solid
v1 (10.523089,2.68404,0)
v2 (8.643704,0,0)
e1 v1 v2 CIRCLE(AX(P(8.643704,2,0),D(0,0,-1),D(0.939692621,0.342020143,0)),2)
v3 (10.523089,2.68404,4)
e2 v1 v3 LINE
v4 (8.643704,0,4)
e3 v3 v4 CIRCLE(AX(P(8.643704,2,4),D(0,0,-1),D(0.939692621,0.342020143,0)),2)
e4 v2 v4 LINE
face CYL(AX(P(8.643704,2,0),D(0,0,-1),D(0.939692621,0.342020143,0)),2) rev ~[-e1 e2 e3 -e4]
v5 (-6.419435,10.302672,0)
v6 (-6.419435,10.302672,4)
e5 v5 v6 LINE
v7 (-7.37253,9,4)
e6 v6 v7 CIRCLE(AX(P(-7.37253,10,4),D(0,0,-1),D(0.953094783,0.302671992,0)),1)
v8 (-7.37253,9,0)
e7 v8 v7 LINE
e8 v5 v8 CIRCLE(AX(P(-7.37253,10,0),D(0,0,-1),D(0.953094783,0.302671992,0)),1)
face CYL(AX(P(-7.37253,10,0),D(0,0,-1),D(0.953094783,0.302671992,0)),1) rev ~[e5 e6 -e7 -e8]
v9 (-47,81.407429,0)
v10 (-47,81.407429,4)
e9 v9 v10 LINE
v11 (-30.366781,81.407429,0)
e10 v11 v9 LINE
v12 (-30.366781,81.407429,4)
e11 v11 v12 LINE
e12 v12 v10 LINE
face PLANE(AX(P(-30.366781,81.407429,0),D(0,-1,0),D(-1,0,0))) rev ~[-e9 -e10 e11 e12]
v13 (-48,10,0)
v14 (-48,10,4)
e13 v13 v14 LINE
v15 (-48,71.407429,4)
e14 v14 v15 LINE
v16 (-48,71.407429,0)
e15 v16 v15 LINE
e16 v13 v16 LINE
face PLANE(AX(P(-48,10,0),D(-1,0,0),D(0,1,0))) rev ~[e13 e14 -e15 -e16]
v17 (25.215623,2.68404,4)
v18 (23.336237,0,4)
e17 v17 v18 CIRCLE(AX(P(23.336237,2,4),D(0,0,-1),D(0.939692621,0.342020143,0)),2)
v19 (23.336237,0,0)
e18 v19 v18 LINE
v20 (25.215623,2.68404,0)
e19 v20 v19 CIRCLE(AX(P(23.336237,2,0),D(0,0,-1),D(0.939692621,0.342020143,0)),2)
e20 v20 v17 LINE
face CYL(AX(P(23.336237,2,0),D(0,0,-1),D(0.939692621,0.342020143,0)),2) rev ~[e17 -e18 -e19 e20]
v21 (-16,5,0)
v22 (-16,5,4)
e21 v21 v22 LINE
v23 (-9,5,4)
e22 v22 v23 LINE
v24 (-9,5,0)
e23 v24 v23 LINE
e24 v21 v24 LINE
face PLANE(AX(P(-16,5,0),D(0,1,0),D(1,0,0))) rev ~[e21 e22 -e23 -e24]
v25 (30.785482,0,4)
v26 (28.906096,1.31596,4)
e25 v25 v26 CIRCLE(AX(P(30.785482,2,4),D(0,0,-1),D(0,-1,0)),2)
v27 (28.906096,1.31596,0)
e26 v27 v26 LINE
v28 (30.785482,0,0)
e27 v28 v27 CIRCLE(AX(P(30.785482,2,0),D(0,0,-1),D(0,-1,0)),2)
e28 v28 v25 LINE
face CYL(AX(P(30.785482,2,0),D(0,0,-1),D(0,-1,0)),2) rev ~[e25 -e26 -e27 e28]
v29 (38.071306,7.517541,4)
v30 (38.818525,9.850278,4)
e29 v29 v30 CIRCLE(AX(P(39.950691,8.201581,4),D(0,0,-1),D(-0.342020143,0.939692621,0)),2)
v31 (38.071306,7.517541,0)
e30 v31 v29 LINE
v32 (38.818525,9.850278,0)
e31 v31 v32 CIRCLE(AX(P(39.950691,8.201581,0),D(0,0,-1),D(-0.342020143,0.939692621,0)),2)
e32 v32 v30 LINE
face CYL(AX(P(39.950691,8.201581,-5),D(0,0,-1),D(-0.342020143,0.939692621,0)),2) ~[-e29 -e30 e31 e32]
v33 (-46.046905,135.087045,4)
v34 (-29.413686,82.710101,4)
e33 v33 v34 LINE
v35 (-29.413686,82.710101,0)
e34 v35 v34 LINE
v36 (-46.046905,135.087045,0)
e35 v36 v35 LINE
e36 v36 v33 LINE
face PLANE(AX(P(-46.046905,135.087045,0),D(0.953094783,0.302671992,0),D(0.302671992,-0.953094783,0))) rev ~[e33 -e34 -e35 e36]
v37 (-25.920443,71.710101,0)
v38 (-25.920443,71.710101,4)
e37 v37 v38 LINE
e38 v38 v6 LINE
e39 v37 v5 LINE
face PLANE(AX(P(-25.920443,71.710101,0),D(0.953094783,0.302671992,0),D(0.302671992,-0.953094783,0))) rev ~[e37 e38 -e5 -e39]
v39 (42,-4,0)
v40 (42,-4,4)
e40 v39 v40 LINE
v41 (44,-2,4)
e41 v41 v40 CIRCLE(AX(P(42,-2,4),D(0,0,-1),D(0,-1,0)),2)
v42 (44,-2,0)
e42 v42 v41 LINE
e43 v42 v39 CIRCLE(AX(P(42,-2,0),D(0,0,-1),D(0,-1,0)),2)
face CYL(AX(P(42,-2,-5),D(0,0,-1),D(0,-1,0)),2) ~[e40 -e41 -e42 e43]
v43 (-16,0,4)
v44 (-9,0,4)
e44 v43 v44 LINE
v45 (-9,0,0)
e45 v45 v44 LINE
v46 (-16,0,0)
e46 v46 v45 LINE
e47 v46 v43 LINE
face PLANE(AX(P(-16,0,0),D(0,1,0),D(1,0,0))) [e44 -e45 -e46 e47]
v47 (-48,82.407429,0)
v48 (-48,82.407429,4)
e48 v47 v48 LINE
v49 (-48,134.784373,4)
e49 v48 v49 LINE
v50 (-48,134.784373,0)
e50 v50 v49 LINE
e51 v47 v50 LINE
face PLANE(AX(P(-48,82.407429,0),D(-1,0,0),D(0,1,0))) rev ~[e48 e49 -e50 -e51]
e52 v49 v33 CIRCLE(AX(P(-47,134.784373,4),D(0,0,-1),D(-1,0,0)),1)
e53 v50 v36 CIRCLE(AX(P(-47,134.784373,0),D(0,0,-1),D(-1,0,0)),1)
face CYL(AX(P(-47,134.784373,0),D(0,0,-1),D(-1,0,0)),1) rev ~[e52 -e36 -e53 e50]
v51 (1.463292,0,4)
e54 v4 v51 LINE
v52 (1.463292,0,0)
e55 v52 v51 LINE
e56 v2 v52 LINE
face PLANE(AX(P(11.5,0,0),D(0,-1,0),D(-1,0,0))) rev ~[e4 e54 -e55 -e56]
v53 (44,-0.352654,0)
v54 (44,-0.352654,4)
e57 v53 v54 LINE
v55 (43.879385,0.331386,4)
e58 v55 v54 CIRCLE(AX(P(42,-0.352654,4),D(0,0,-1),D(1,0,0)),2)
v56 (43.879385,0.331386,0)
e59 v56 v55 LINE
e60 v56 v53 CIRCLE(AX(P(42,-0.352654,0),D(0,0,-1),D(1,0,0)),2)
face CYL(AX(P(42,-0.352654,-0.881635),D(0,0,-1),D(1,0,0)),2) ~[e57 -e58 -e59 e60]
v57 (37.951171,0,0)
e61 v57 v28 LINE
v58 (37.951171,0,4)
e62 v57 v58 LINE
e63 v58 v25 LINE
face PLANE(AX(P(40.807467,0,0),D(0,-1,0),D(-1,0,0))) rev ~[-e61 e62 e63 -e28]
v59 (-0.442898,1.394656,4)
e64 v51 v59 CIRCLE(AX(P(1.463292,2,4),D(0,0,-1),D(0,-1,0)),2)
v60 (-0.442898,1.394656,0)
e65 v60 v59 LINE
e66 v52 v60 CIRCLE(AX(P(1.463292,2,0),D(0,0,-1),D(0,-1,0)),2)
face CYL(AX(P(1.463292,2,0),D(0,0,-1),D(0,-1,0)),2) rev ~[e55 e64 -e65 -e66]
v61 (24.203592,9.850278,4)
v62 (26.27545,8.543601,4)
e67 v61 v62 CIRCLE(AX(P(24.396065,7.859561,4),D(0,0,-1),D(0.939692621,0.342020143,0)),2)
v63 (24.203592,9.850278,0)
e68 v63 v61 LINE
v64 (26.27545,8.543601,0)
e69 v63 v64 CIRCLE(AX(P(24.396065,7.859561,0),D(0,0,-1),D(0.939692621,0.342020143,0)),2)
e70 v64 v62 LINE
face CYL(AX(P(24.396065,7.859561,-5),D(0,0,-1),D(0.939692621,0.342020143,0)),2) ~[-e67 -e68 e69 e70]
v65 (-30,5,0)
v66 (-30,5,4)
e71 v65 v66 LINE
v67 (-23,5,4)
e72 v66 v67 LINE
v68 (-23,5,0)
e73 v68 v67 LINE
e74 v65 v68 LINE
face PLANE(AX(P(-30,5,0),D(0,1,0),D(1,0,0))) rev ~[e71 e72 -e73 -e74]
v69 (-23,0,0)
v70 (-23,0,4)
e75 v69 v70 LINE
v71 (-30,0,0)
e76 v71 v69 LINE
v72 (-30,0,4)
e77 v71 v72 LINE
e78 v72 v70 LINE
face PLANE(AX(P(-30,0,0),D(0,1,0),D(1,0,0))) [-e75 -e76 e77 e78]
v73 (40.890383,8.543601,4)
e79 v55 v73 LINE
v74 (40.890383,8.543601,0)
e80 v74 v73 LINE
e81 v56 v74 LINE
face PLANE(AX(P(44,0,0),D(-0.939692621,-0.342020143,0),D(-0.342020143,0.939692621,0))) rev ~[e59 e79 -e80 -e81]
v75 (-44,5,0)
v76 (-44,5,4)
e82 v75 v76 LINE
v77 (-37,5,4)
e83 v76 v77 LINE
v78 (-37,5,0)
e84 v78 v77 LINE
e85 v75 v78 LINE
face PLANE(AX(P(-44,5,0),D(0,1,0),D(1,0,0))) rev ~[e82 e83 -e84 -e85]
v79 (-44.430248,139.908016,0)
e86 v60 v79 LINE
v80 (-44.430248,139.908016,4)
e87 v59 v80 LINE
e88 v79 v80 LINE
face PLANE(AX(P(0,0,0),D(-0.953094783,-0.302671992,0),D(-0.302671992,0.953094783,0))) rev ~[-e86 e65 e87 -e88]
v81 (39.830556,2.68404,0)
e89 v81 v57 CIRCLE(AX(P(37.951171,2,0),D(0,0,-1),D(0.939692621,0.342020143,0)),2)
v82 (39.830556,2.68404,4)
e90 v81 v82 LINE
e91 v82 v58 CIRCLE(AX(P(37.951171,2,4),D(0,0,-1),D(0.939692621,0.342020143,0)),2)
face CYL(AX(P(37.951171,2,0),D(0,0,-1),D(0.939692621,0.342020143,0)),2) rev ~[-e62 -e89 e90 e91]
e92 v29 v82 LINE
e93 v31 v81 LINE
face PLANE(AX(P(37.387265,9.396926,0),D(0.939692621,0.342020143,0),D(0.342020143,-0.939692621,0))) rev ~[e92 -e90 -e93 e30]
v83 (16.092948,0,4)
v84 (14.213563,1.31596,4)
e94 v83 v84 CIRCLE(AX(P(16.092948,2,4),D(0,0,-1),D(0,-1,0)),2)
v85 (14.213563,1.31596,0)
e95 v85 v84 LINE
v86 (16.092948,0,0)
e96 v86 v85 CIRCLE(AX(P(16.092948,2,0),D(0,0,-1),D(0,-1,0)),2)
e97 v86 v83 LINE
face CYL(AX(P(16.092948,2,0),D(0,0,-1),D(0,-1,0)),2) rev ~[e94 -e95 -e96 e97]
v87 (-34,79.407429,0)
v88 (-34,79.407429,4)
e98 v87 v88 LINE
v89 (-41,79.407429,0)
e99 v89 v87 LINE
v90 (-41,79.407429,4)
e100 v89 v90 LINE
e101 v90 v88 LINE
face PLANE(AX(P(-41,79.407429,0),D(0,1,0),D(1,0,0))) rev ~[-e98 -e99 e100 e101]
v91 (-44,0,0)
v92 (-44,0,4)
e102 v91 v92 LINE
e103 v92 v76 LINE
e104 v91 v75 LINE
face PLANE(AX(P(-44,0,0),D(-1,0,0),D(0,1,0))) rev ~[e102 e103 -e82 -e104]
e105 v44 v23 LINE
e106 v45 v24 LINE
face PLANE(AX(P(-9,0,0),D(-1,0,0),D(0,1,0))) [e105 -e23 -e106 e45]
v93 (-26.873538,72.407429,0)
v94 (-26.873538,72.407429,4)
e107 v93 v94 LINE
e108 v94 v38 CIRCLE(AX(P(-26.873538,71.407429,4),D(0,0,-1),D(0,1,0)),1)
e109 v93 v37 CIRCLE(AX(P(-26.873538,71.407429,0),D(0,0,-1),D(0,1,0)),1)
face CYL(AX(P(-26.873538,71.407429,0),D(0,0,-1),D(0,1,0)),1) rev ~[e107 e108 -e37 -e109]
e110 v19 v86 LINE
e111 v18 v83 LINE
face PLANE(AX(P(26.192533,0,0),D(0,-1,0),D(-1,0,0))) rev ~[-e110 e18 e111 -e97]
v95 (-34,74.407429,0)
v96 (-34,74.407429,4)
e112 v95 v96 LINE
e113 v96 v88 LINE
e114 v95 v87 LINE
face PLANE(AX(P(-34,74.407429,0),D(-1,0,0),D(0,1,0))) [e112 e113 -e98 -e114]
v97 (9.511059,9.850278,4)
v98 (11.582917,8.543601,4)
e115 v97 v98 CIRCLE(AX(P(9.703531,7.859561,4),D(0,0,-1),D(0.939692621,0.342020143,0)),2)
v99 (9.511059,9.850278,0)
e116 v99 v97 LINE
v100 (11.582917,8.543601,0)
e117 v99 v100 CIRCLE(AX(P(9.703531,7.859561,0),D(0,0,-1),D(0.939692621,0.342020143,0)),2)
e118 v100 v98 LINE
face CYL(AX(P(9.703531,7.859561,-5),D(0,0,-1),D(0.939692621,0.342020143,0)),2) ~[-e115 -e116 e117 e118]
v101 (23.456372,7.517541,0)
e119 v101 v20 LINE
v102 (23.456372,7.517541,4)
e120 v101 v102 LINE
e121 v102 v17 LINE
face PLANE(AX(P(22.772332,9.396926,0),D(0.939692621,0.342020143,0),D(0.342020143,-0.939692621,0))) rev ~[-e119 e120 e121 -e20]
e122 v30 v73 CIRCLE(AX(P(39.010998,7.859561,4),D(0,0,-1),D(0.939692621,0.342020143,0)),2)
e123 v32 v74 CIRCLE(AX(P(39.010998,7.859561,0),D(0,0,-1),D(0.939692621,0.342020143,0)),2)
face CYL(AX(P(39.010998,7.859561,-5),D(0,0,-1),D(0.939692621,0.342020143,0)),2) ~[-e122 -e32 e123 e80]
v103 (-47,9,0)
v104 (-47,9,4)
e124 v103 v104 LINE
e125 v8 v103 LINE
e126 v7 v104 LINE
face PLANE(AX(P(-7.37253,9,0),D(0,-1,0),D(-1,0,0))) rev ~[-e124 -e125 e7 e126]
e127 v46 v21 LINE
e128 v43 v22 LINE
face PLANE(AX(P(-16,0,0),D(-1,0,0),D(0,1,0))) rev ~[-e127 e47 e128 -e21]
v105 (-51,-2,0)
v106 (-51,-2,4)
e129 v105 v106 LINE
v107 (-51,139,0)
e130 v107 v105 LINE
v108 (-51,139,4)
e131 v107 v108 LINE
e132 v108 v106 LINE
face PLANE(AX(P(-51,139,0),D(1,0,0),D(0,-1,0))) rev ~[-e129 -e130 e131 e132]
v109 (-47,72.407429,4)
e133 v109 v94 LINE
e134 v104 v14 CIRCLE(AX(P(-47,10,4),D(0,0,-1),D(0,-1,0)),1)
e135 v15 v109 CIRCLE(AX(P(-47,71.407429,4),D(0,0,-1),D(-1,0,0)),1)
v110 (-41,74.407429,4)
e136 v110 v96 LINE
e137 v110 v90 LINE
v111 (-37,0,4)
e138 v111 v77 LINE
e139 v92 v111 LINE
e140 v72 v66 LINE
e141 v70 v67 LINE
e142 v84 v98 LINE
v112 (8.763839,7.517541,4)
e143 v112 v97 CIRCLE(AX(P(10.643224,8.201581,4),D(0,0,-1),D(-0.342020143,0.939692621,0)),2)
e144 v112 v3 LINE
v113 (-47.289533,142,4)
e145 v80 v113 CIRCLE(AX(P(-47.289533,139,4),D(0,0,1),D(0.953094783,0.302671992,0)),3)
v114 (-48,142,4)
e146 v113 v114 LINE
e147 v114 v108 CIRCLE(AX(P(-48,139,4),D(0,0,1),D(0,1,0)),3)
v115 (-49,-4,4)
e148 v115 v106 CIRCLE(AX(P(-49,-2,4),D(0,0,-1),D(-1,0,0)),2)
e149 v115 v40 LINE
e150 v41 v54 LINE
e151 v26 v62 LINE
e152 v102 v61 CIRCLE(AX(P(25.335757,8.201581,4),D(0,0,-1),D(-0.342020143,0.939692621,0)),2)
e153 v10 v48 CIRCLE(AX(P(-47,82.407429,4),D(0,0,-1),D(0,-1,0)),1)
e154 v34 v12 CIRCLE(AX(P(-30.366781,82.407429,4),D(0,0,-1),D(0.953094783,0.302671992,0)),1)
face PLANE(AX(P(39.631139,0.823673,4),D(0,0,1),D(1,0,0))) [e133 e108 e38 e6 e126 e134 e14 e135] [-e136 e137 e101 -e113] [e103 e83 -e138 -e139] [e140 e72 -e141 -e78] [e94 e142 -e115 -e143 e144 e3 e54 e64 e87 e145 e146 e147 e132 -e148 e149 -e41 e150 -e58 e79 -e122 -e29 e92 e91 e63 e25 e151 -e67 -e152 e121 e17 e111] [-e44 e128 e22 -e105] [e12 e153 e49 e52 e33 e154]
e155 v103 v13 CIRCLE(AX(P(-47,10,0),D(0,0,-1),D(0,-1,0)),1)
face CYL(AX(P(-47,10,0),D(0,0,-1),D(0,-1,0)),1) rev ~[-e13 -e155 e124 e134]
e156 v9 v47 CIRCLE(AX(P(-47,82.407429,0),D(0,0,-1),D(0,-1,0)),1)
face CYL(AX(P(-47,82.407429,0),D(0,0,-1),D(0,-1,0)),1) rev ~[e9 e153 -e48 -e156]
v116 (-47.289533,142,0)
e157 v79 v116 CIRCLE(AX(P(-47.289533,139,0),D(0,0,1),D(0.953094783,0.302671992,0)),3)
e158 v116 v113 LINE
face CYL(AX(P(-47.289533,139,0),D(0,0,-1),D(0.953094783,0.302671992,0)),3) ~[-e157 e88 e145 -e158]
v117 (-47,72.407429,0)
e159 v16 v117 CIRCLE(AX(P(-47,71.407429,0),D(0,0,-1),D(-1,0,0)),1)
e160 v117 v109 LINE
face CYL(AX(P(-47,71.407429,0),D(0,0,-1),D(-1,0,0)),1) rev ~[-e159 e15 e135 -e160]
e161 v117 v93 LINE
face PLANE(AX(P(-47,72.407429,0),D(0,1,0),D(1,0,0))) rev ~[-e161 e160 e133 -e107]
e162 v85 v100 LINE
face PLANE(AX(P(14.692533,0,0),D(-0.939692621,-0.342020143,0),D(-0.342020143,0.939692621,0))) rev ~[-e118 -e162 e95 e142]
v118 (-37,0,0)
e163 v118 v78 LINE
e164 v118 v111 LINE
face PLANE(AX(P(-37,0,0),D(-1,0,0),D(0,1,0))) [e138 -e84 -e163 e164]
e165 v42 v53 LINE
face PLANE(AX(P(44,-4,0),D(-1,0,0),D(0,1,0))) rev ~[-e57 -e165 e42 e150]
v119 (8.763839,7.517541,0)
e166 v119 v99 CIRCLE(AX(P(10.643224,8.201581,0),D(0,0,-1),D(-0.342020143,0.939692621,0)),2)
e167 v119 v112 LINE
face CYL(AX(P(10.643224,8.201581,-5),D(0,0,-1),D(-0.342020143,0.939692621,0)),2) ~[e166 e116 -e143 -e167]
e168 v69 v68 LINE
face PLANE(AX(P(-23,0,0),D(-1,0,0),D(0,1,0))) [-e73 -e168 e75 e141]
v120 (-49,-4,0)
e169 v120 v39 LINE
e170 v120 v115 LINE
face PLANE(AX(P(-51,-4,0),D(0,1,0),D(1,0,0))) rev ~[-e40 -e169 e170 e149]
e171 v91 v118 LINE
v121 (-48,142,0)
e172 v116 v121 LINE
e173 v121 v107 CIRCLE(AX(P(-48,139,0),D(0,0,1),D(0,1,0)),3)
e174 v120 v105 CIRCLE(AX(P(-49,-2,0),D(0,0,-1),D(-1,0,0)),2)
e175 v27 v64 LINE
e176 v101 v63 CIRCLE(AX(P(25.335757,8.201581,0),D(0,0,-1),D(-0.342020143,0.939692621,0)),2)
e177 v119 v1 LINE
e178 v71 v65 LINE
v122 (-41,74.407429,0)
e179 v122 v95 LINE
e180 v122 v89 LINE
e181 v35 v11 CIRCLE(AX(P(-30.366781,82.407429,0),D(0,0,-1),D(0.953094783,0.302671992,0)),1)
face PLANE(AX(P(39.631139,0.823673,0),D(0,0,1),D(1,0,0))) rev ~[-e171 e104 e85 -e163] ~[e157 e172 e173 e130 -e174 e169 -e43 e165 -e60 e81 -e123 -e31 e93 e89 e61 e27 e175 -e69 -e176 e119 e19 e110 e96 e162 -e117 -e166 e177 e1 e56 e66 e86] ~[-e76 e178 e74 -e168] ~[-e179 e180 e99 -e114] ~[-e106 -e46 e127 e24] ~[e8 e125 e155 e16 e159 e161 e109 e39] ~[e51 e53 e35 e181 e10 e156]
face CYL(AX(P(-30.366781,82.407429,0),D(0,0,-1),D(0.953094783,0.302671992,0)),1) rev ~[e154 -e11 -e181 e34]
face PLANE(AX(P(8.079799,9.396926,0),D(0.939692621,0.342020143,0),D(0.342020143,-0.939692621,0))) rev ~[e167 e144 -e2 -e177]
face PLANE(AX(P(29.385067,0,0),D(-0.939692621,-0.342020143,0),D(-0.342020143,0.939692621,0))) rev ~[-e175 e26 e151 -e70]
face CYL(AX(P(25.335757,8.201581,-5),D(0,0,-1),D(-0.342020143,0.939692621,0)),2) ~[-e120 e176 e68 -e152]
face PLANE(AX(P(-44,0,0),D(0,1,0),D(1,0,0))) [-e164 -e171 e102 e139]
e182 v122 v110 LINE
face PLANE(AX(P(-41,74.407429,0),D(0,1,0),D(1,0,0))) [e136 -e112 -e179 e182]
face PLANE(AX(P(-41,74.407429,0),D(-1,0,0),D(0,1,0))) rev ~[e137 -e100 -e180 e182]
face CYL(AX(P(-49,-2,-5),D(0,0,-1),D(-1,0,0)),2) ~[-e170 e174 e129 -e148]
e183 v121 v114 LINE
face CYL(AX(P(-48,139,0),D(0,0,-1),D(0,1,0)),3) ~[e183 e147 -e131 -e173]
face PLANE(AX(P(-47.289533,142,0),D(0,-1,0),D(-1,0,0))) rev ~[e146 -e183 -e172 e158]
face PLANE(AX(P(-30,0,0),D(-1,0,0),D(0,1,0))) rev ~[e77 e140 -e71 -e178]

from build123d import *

# Parameters (mm, degrees)
F0_W        = 7
F0_H        = 5
F1_DEPTH    = 4
F2_T1_DEPTH = 4
F2_T3_DEPTH = 14
F2_T5_DEPTH = 5.7632698071


# Not quite as in the source:
# - a fillet or chamfer that OpenCascade refuses, or shapes differently, is made with other operations: its cross-section is extruded or revolved along the edge and cut away or added


with BuildPart() as f1:
    # F0 (on Top) → F1 (new body)
    with BuildSketch(Plane.XY):
        with BuildLine():
            Line((-51, -4), (44, -4))
            Line((44, -4), (44, 0))
            Line((44, 0), (40.8074666826, 0))
            Line((40.8074666826, 0), (29.3850666349, 0))
            Line((29.3850666349, 0), (26.1925333174, 0))
            Line((26.1925333174, 0), (14.6925333174, 0))
            Line((14.6925333174, 0), (11.5, 0))
            Line((11.5, 0), (0, 0))
            Line((0, 0), (-44.4302483166, 139.9080159757))
            ThreePointArc((-44.4302483166, 139.9080159757), (-45.5180993372, 141.4211616971), (-47.2895326655, 142))
            Line((-47.2895326655, 142), (-48, 142))
            ThreePointArc((-48, 142), (-50.1213203436, 141.1213203436), (-51, 139))
            Line((-51, 139), (-51, -4))
        make_face()
        with Locations((-40.5, 2.5)):
            Rectangle(F0_W, F0_H, mode=Mode.SUBTRACT)
        with Locations((-26.5, 2.5)):
            Rectangle(F0_W, F0_H, mode=Mode.SUBTRACT)
        with Locations((-12.5, 2.5)):
            Rectangle(F0_W, F0_H, mode=Mode.SUBTRACT)
        with BuildLine():
            Line((-7.3725300405, 9), (-47, 9))
            ThreePointArc((-47, 9), (-47.7071067812, 9.2928932188), (-48, 10))
            Line((-48, 10), (-48, 71.4074290533))
            ThreePointArc((-48, 71.4074290533), (-47.7071067812, 72.1145358345), (-47, 72.4074290533))
            Line((-47, 72.4074290533), (-26.8735379155, 72.4074290533))
            ThreePointArc((-26.8735379155, 72.4074290533), (-26.2830601394, 72.2144829523), (-25.9204431326, 71.7101010452))
            Line((-25.9204431326, 71.7101010452), (-6.4194352575, 10.3026719919))
            ThreePointArc((-6.4194352575, 10.3026719919), (-6.5654761415, 9.4095222239), (-7.3725300405, 9))
        make_face(mode=Mode.SUBTRACT)
        with Locations((-37.5, 76.9074290533)):
            Rectangle(F0_W, F0_H, mode=Mode.SUBTRACT)
        with BuildLine():
            ThreePointArc((-48, 134.7843734895), (-47.1531424452, 135.7725776139), (-46.046905217, 135.0870454814))
            Line((-46.046905217, 135.0870454814), (-29.4136863758, 82.7101010452))
            ThreePointArc((-29.4136863758, 82.7101010452), (-29.5597272597, 81.8169512772), (-30.3667811588, 81.4074290533))
            Line((-30.3667811588, 81.4074290533), (-47, 81.4074290533))
            ThreePointArc((-47, 81.4074290533), (-47.7071067812, 81.7003222721), (-48, 82.4074290533))
            Line((-48, 82.4074290533), (-48, 134.7843734895))
        make_face(mode=Mode.SUBTRACT)
        Polygon((40.8074666826, 0), (44, 0), (40.2063431117, 10.4229866378), (37.3872652493, 9.3969262079), align=None)
        Polygon((26.1925333174, 0), (29.3850666349, 0), (25.5914097465, 10.4229866378), (22.7723318842, 9.3969262079), align=None)
        Polygon((11.5, 0), (14.6925333174, 0), (10.8988764291, 10.4229866378), (8.0797985667, 9.3969262079), align=None)
    extrude(amount=F1_DEPTH)

    # F2: fillet of radius 2 on 15 edges, made by hand

    # F2_s2 → F2_t1 (join)
    with BuildSketch(Plane.XY):
        with BuildLine():
            ThreePointArc((39.8305559107, 2.6840402867), (39.5894747577, 0.8528471273), (37.9511706691, 0))
            Line((37.9511706691, 0), (40.8074666826, 0))
            Line((40.8074666826, 0), (39.8305559107, 2.6840402867))
        make_face()
        with BuildLine():
            ThreePointArc((16.0929483938, 0), (14.9457955211, 0.3616959114), (14.2135631523, 1.3159597133))
            Line((14.2135631523, 1.3159597133), (14.6925333174, 0))
            Line((14.6925333174, 0), (16.0929483938, 0))
        make_face()
        with BuildLine():
            ThreePointArc((10.5230892281, 2.6840402867), (10.2820080751, 0.8528471273), (8.6437039865, 0))
            Line((8.6437039865, 0), (11.5, 0))
            Line((11.5, 0), (10.5230892281, 2.6840402867))
        make_face()
        with BuildLine():
            ThreePointArc((1.4632920473, 0), (0.2823364951, 0.3858922019), (-0.4428975187, 1.3946560162))
            Line((-0.4428975187, 1.3946560162), (0, 0))
            Line((0, 0), (1.4632920473, 0))
        make_face()
        with BuildLine():
            ThreePointArc((25.2156225455, 2.6840402867), (24.9745413925, 0.8528471273), (23.3362373039, 0))
            Line((23.3362373039, 0), (26.1925333174, 0))
            Line((26.1925333174, 0), (25.2156225455, 2.6840402867))
        make_face()
        with BuildLine():
            ThreePointArc((30.7854817113, 0), (29.6383288386, 0.3616959114), (28.9060964697, 1.3159597133))
            Line((28.9060964697, 1.3159597133), (29.3850666349, 0))
            Line((29.3850666349, 0), (30.7854817113, 0))
        make_face()
    extrude(amount=F2_T1_DEPTH)

    # F2_s4 → F2_t3 (cut)
    with BuildSketch(Plane.XY.offset(-5)):
        with BuildLine():
            ThreePointArc((-51, -2), (-50.4142135624, -3.4142135624), (-49, -4))
            Line((-49, -4), (-51, -4))
            Line((-51, -4), (-51, -2))
        make_face()
        with BuildLine():
            ThreePointArc((42, -4), (43.4142135624, -3.4142135624), (44, -2))
            Line((44, -2), (44, -4))
            Line((44, -4), (42, -4))
        make_face()
        with BuildLine():
            ThreePointArc((40.8903833983, 8.5436013963), (39.8562346802, 9.6721766837), (38.3269578701, 9.7389463512))
            Line((38.3269578701, 9.7389463512), (40.2063431117, 10.4229866378))
            Line((40.2063431117, 10.4229866378), (40.8903833983, 8.5436013963))
        make_face()
        with BuildLine():
            ThreePointArc((39.2666504909, 10.0809664945), (38.1380752035, 9.0468177764), (38.071305536, 7.5175409663))
            Line((38.071305536, 7.5175409663), (37.3872652493, 9.3969262079))
            Line((37.3872652493, 9.3969262079), (39.2666504909, 10.0809664945))
        make_face()
        with BuildLine():
            ThreePointArc((11.5829167158, 8.5436013963), (10.5487679977, 9.6721766837), (9.0194911875, 9.7389463512))
            Line((9.0194911875, 9.7389463512), (10.8988764291, 10.4229866378))
            Line((10.8988764291, 10.4229866378), (11.5829167158, 8.5436013963))
        make_face()
        with BuildLine():
            ThreePointArc((9.9591838083, 10.0809664945), (8.8306085209, 9.0468177764), (8.7638388534, 7.5175409663))
            Line((8.7638388534, 7.5175409663), (8.0797985667, 9.3969262079))
            Line((8.0797985667, 9.3969262079), (9.9591838083, 10.0809664945))
        make_face()
        with BuildLine():
            ThreePointArc((24.6517171257, 10.0809664945), (23.5231418383, 9.0468177764), (23.4563721708, 7.5175409663))
            Line((23.4563721708, 7.5175409663), (22.7723318842, 9.3969262079))
            Line((22.7723318842, 9.3969262079), (24.6517171257, 10.0809664945))
        make_face()
        with BuildLine():
            ThreePointArc((26.2754500332, 8.5436013963), (25.2413013151, 9.6721766837), (23.712024505, 9.7389463512))
            Line((23.712024505, 9.7389463512), (25.5914097465, 10.4229866378))
            Line((25.5914097465, 10.4229866378), (26.2754500332, 8.5436013963))
        make_face()
    extrude(amount=F2_T3_DEPTH, mode=Mode.SUBTRACT)

    # F2_s6 → F2_t5 (cut)
    with BuildSketch(Plane.XY.offset(-0.8816349035)):
        with BuildLine():
            ThreePointArc((44, -0.3526539614), (43.969615506, -0.0053576061), (43.8793852416, 0.3313863252))
            Line((43.8793852416, 0.3313863252), (44, 0))
            Line((44, 0), (44, -0.3526539614))
        make_face()
    extrude(amount=F2_T5_DEPTH, mode=Mode.SUBTRACT)


solid = f1.part
